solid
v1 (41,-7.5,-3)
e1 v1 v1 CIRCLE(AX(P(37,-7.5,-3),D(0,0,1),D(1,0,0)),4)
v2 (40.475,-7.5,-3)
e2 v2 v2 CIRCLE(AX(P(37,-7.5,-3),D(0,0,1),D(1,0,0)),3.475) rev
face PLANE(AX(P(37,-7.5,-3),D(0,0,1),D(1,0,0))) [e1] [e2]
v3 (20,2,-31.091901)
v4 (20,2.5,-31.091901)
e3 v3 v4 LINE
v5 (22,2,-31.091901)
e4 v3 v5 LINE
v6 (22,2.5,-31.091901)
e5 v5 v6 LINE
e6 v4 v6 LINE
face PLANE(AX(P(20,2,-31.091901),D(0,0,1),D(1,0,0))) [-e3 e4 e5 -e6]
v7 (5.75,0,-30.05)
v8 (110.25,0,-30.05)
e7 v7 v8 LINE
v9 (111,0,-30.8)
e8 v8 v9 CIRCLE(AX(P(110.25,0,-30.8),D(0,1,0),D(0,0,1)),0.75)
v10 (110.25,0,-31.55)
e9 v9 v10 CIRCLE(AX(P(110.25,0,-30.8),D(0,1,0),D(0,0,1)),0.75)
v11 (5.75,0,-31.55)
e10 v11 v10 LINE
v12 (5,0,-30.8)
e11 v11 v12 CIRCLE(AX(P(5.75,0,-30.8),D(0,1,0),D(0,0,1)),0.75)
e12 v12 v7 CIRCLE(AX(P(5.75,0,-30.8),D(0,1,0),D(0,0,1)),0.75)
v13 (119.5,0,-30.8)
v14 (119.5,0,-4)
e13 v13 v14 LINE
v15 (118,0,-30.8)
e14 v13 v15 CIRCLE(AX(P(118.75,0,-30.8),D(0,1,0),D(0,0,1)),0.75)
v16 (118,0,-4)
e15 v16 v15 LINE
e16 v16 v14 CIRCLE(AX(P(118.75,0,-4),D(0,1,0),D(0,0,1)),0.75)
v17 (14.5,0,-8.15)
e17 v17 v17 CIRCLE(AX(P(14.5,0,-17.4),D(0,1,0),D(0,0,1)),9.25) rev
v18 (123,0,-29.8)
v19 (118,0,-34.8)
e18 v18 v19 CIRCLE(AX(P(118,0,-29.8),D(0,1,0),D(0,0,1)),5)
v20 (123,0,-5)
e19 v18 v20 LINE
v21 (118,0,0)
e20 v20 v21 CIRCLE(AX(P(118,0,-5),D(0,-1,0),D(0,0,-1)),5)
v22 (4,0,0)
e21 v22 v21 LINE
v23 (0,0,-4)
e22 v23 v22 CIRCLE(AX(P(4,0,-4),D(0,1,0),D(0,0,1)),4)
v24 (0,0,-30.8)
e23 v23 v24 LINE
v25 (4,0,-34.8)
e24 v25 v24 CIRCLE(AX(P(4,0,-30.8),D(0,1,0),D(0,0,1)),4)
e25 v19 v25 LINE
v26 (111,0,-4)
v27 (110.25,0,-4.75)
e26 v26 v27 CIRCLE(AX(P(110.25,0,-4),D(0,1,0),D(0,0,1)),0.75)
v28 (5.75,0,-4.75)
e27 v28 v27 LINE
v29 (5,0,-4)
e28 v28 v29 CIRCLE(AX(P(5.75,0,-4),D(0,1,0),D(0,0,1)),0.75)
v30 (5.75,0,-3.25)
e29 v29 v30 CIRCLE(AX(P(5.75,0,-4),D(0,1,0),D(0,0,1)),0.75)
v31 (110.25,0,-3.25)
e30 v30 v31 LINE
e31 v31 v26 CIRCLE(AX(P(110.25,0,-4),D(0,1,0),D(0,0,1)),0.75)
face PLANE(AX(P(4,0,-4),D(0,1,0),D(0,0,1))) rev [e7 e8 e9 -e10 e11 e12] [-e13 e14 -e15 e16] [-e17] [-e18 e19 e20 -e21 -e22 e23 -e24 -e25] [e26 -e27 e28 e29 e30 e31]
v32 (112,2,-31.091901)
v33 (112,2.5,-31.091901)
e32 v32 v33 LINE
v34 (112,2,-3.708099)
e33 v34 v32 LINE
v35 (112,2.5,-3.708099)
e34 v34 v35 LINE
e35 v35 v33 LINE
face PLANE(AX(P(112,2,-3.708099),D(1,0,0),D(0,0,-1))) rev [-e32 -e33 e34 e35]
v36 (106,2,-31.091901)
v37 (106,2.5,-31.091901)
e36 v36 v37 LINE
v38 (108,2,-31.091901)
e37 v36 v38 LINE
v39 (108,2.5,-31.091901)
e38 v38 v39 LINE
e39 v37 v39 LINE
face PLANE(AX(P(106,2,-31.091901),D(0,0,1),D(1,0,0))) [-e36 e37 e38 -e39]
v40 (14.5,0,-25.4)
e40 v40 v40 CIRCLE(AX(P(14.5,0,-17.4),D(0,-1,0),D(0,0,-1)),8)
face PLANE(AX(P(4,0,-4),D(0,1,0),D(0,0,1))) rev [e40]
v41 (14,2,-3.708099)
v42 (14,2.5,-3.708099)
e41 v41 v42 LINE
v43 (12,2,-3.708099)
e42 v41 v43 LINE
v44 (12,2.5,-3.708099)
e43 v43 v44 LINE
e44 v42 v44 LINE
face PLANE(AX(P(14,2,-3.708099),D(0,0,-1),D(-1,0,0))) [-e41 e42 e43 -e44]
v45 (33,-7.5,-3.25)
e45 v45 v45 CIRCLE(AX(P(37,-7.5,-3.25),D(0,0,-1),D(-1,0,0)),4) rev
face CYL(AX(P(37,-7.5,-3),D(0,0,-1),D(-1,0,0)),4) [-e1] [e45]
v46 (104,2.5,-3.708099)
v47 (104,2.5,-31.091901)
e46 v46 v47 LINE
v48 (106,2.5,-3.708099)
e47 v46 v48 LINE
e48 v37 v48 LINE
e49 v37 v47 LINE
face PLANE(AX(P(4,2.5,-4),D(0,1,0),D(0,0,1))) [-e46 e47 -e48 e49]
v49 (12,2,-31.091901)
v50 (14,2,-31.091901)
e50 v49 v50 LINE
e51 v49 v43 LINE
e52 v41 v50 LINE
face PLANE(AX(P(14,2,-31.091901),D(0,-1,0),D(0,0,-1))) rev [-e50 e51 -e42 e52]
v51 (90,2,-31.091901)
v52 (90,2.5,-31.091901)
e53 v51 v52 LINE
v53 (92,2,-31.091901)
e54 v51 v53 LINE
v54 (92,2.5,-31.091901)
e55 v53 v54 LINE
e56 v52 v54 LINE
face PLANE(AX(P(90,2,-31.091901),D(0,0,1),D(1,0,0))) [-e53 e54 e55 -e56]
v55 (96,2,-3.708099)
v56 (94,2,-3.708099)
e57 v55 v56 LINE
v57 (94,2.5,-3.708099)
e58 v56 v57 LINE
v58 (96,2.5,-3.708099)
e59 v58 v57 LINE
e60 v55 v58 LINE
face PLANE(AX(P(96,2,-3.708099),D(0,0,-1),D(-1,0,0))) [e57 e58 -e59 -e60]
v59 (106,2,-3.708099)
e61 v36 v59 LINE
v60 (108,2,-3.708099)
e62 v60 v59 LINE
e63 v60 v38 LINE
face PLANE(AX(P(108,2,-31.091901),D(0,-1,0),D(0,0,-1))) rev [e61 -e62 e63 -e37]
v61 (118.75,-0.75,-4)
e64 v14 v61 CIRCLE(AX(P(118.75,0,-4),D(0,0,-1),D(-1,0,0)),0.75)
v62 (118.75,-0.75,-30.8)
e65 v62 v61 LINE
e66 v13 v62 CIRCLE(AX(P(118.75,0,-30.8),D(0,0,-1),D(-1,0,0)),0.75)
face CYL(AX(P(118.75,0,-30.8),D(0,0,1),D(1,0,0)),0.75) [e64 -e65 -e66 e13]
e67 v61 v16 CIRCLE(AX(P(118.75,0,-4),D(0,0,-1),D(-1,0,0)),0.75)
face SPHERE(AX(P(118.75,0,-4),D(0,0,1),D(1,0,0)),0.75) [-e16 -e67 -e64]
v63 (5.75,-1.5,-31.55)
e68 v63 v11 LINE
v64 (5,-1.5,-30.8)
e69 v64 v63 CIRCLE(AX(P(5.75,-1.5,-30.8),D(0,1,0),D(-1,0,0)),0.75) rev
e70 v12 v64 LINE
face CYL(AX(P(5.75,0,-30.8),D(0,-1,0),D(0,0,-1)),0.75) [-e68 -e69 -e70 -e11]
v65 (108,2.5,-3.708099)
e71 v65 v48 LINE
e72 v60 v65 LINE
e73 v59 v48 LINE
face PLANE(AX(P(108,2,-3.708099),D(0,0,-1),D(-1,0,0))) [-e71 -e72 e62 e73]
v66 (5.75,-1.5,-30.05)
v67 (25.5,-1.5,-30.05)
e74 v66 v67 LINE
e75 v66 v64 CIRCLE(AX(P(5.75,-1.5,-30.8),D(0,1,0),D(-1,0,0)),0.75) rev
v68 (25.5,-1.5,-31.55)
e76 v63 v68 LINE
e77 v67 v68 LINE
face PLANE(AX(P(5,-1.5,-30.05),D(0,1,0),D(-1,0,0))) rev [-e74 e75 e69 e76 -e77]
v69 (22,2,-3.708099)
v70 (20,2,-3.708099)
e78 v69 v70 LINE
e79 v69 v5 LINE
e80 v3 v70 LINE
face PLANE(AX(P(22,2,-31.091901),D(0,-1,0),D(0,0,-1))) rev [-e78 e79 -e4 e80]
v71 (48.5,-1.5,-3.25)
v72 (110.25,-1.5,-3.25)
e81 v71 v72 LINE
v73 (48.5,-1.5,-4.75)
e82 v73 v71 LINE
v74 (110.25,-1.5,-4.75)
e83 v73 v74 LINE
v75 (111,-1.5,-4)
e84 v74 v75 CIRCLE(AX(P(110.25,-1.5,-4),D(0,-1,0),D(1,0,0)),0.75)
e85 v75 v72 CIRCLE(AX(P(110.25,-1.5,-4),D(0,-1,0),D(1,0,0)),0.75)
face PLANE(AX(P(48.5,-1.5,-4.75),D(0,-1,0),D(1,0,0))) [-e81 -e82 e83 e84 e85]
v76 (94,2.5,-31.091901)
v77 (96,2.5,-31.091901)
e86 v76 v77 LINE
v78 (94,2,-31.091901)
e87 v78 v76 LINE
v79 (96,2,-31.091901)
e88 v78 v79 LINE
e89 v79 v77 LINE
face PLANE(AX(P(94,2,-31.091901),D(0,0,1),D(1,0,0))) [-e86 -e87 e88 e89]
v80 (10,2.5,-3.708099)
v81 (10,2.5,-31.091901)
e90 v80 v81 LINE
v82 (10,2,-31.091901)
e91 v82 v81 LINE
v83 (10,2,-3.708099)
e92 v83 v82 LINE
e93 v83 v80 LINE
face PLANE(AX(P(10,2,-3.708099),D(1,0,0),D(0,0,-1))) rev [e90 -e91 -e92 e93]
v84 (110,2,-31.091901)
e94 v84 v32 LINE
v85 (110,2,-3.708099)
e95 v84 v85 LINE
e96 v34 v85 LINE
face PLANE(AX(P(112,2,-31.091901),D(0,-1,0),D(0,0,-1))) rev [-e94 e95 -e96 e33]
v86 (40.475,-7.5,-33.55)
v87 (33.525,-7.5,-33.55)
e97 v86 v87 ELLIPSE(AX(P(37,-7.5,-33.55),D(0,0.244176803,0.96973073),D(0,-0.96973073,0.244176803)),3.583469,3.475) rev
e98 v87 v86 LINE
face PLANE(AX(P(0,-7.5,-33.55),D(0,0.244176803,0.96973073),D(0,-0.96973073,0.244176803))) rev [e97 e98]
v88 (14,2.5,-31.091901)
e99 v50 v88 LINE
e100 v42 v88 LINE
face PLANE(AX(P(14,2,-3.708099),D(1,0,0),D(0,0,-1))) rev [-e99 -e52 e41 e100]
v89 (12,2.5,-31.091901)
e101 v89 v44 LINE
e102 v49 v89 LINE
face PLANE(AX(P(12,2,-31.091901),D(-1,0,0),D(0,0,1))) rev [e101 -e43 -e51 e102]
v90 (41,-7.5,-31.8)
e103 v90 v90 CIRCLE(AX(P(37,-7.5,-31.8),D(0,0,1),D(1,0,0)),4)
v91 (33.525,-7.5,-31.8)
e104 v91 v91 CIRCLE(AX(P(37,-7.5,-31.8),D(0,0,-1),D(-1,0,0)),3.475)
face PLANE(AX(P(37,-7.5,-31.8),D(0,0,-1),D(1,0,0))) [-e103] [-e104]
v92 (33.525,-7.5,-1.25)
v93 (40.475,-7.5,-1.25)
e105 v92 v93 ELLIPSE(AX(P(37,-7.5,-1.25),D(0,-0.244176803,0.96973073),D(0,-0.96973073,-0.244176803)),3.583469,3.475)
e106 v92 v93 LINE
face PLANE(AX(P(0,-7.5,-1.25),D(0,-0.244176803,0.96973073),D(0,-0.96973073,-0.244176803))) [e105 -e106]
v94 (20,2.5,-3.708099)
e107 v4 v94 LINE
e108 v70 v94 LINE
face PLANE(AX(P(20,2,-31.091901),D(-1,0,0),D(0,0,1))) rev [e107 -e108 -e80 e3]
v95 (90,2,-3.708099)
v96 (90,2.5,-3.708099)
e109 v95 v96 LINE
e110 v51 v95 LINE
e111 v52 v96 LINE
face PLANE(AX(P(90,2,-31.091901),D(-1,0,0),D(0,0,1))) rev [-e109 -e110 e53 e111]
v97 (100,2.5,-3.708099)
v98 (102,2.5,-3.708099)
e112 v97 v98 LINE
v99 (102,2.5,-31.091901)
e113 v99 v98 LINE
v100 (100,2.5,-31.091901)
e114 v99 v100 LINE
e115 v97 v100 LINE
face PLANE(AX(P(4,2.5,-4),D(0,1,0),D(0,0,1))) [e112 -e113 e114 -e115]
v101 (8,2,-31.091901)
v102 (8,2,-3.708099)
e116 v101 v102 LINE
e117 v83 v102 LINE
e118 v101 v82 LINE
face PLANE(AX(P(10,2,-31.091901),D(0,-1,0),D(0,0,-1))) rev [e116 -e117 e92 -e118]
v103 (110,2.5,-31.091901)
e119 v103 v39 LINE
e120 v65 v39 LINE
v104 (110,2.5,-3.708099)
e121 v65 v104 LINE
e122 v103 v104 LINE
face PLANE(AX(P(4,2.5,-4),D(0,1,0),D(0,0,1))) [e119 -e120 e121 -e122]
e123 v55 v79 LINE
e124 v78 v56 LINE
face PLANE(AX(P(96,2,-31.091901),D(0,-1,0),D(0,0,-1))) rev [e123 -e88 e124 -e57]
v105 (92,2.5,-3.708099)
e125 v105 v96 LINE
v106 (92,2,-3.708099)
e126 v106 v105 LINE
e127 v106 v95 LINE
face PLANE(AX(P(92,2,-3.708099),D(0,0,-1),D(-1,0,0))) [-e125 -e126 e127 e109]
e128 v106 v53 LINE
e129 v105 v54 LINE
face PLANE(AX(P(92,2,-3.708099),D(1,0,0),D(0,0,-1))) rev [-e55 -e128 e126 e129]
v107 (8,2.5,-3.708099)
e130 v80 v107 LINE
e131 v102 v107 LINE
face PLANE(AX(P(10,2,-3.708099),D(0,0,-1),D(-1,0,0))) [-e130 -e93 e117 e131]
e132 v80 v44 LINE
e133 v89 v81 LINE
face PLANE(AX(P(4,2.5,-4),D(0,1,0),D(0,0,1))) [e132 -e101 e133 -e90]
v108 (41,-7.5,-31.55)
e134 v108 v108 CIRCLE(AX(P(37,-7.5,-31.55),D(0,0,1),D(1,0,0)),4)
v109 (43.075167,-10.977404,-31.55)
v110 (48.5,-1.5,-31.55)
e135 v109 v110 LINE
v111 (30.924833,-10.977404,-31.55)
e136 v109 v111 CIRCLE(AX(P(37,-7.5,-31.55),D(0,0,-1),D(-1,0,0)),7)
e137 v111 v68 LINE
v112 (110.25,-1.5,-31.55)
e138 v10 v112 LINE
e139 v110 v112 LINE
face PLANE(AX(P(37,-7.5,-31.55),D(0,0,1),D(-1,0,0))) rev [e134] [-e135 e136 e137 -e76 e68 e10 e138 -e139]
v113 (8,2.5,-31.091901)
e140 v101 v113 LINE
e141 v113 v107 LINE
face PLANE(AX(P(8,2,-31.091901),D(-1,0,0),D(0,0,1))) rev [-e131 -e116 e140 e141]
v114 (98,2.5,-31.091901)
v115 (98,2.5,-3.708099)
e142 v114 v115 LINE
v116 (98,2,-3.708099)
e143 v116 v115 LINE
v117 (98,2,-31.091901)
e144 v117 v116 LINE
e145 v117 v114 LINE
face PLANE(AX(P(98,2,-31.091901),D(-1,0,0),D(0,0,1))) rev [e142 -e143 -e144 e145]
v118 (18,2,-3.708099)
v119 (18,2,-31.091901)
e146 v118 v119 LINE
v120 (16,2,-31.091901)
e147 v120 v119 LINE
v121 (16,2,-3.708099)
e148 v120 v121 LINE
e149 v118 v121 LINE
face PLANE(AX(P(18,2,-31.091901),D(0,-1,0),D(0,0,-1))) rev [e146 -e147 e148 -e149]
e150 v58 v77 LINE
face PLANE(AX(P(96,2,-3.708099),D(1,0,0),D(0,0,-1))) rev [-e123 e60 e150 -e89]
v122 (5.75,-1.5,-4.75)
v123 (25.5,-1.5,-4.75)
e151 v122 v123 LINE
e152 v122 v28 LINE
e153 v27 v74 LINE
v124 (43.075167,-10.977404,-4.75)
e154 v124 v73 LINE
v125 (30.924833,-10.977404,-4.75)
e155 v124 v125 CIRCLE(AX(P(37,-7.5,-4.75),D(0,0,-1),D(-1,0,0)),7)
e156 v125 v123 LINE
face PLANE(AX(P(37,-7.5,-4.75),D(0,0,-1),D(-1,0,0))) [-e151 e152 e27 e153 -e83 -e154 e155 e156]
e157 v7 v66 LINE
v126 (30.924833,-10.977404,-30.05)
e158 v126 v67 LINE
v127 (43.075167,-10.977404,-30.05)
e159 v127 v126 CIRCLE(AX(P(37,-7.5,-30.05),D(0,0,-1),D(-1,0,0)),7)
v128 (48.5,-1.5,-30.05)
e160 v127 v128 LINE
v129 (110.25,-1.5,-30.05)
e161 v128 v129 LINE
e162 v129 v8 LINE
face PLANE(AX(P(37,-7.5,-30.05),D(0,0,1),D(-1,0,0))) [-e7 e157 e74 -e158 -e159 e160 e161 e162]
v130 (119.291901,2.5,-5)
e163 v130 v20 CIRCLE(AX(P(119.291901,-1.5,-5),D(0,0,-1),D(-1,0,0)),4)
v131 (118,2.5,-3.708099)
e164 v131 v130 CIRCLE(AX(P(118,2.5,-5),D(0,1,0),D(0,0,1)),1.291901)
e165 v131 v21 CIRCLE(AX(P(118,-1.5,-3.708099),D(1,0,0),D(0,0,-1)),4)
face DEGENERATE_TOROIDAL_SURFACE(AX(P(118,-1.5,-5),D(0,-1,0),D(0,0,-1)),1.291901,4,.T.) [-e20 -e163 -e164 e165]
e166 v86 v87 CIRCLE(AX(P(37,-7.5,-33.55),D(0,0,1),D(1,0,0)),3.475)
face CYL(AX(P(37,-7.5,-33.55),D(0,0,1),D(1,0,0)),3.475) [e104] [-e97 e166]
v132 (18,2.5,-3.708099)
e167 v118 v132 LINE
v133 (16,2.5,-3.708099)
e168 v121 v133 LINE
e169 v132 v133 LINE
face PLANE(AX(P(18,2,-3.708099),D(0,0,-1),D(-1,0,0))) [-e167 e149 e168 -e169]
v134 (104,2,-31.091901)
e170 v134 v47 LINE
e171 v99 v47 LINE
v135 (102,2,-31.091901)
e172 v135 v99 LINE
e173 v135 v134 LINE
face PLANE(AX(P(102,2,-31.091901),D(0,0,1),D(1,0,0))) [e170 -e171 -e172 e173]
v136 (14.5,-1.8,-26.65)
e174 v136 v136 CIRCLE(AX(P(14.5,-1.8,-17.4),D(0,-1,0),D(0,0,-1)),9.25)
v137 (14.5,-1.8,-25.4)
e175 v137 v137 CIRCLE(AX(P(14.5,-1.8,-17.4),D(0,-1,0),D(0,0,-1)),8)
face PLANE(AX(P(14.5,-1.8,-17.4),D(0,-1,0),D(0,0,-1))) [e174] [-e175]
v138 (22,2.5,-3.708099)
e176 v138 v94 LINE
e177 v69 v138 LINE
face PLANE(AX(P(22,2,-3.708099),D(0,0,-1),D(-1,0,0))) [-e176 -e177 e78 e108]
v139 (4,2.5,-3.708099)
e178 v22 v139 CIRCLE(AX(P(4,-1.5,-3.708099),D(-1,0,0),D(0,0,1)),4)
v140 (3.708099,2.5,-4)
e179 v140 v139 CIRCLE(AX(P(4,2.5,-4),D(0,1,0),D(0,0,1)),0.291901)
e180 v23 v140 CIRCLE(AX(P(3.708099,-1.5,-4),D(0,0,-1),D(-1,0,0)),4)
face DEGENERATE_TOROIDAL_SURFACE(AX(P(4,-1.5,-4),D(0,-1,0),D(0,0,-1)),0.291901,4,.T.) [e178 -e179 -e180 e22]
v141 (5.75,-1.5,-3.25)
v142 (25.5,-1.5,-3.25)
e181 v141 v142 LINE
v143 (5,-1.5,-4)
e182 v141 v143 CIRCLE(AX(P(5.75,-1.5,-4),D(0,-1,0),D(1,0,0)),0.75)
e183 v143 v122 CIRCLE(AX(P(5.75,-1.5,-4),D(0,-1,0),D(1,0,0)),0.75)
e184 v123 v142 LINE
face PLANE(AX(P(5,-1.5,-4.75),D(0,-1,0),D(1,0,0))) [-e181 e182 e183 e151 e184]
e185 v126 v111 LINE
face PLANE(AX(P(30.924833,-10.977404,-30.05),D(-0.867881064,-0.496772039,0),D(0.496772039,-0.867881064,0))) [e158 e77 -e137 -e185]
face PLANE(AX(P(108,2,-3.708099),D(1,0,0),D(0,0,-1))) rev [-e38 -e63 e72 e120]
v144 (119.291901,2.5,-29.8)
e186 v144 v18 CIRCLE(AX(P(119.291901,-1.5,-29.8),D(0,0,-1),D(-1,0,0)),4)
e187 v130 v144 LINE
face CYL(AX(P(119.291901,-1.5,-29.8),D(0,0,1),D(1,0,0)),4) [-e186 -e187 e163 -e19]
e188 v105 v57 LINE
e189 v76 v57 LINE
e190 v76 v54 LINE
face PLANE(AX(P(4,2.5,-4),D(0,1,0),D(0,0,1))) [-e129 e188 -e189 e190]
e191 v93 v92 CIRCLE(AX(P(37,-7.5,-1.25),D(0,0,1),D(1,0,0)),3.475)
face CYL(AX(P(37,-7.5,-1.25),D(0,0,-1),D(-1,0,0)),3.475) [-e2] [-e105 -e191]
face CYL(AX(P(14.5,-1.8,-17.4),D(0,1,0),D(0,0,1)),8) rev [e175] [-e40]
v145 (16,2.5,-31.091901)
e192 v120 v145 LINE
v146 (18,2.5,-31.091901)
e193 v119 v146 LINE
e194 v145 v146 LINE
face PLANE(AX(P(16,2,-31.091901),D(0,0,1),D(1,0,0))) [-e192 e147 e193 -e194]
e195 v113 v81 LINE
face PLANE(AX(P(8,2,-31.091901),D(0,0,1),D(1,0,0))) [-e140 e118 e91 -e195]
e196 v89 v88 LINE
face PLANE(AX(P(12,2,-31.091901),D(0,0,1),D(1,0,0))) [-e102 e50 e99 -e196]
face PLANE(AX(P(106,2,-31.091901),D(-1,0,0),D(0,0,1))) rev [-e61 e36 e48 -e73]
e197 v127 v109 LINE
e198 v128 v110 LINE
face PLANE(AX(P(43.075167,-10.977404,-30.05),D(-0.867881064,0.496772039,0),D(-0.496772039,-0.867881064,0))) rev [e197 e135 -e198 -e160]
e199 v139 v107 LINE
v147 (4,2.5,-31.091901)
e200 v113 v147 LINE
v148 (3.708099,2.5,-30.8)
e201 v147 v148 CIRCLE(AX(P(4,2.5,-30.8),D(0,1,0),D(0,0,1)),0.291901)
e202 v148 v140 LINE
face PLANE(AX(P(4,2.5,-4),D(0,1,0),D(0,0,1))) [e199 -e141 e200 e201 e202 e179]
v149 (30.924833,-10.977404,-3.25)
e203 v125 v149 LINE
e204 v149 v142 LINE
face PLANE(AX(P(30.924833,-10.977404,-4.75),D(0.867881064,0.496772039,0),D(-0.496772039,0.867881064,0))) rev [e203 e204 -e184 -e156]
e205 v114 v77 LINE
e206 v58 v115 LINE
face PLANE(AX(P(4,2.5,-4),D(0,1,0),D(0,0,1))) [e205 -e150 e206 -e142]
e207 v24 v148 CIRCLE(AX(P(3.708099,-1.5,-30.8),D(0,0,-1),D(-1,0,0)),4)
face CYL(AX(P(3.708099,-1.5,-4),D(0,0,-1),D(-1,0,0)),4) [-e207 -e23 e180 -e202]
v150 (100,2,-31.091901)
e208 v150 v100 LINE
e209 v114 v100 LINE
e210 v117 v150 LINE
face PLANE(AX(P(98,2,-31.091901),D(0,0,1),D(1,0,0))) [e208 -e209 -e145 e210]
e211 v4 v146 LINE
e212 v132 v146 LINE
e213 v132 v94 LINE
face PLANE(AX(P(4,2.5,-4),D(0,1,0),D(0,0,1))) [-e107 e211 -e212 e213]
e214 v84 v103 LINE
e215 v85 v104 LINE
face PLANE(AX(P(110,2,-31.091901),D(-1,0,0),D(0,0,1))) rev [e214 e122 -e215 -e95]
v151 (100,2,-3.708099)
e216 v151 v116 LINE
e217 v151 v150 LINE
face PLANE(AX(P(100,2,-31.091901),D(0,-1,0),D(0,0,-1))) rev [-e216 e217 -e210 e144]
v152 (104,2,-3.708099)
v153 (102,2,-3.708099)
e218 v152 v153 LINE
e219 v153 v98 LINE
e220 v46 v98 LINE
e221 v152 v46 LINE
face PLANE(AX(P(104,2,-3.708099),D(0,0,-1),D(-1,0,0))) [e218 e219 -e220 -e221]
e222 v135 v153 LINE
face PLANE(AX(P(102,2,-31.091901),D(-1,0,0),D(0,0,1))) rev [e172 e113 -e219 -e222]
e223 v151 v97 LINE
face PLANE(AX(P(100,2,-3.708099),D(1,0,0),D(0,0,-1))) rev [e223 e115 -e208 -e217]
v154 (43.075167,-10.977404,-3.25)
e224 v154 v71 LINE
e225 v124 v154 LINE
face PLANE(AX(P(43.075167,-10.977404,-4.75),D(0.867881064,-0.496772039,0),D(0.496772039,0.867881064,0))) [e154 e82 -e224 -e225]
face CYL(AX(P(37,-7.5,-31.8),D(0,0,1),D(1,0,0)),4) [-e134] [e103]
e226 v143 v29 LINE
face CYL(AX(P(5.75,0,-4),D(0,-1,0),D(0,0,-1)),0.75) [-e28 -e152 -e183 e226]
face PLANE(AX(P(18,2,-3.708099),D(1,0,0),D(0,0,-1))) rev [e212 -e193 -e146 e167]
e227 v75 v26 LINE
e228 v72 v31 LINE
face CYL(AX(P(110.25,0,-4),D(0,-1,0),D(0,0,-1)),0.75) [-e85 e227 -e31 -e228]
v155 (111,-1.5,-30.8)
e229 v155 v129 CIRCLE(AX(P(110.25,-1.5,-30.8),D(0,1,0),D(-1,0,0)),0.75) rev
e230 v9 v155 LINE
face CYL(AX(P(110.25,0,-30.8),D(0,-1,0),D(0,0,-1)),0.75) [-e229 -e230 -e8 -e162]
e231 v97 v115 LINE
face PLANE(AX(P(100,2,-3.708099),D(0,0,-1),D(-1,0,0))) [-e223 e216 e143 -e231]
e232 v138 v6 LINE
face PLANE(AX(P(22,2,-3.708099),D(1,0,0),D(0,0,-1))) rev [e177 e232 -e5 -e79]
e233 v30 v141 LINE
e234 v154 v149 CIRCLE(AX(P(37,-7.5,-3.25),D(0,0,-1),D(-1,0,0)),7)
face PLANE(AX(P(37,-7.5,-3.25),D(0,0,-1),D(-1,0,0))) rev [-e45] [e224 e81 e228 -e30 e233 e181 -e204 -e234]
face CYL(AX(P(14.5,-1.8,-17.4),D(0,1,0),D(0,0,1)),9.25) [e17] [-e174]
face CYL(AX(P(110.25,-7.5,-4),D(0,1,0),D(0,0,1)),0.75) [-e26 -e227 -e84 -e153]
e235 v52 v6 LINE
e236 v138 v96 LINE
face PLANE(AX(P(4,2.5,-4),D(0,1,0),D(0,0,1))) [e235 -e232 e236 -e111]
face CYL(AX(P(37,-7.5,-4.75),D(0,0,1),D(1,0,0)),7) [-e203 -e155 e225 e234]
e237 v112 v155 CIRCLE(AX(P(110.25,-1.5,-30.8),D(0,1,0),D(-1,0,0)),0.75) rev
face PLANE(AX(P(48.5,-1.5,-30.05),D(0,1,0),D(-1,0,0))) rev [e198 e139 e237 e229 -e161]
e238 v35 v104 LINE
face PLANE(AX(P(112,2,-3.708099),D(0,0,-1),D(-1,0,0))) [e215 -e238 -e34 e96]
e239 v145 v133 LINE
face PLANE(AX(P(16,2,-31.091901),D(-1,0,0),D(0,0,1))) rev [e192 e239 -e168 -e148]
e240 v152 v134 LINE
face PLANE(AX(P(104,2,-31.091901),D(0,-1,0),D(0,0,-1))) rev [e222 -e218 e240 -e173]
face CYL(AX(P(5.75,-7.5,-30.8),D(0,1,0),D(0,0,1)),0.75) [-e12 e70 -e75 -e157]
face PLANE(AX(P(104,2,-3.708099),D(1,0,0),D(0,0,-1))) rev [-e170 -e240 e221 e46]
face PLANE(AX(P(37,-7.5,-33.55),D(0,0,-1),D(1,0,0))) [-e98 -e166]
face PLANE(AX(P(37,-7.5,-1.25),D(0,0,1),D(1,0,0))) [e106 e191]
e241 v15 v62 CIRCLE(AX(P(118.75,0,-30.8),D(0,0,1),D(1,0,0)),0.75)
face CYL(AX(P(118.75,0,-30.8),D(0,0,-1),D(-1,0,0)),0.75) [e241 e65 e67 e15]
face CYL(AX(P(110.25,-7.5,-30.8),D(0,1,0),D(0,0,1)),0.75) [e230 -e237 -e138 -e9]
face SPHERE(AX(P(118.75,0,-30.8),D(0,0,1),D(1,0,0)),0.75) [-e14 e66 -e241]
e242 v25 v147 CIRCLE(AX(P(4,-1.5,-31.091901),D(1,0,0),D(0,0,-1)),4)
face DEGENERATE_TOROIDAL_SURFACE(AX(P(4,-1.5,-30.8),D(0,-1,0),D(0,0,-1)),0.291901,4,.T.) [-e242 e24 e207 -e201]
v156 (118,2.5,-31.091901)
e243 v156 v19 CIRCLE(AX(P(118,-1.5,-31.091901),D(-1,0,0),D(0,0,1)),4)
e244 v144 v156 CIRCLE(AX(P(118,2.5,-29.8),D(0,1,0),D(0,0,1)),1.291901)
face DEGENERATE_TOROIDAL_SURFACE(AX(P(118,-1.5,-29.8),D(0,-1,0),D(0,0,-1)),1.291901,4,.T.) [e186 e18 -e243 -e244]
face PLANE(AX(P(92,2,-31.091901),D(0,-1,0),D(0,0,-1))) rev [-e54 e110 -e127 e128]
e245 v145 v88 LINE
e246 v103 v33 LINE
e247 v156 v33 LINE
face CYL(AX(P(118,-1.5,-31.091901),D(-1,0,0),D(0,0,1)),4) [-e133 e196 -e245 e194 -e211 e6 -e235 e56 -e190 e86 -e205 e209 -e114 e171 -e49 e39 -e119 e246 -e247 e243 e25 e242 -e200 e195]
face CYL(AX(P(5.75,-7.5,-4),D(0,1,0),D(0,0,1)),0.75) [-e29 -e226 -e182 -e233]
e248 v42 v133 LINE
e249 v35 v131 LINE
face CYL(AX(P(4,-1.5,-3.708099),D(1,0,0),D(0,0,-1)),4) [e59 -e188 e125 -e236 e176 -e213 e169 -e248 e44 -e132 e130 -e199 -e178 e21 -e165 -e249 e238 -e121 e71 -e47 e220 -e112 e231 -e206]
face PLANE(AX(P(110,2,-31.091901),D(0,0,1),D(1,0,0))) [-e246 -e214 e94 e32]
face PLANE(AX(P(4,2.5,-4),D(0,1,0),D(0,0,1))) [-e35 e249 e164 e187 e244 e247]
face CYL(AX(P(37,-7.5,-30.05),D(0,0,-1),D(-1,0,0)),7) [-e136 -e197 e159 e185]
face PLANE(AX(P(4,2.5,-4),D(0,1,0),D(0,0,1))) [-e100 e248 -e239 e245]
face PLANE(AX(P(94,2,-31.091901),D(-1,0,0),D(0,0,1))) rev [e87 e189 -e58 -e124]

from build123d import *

# Parameters (mm, degrees)
BASE_EXTRUDE_DEPTH   = 2.5
FILLET1_R            = 4
BOSS_EXTRUDE1_DEPTH  = 1.5
FILLET2_R            = 0.75
SKETCH4_R            = 4
BOSS_EXTRUDE2_DEPTH  = 0.25
SKETCH5_R            = 3.475
BOSS_EXTRUDE7_DEPTH  = 2
CUT_EXTRUDE2_DEPTH   = 129.647930415
FILLET2_OF_MIRROR1_R = 0.75
BOSS_EXTRUDE8_DEPTH  = 0.75
FILLET3_R            = 0.75
SKETCH8_R            = 9.25
SKETCH8_R_2          = 8
BOSS_EXTRUDE9_DEPTH  = 1.8
SKETCH9_W            = 2
SKETCH9_H            = 27.383801512
CUT_EXTRUDE3_DEPTH   = 0.5
LPATTERN1_COUNT      = 6
LPATTERN1_PITCH      = 4
SKETCH10_W           = 2
SKETCH10_H           = 27.383801512
CUT_EXTRUDE4_DEPTH   = 0.5
LPATTERN2_COUNT      = 4
LPATTERN2_PITCH      = 4


# Some blends are built 0.0001 mm under size
with BuildPart() as part:
    # Sketch1 → Base-Extrude (new body)
    with BuildSketch(Plane(origin=(0, 0, 0), x_dir=(1, 0, 0), z_dir=(0, 1, 0))):
        with BuildLine():
            Line((4, 0), (118, 0))
            ThreePointArc((118, 0), (121.535533906, 1.464466094), (123, 5))
            Line((123, 5), (123, 29.8))
            ThreePointArc((123, 29.8), (121.535533906, 33.335533906), (118, 34.8))
            Line((118, 34.8), (4, 34.8))
            ThreePointArc((4, 34.8), (1.171572875, 33.628427125), (0, 30.8))
            Line((0, 30.8), (0, 4))
            ThreePointArc((0, 4), (1.171572875, 1.171572875), (4, 0))
        make_face()
    extrude(amount=BASE_EXTRUDE_DEPTH)

    # Fillet1
    # the kernel refuses this fillet: 4 mm, written as the material it takes off along each edge
    with BuildSketch(Plane(origin=(118, 2.5, -5), x_dir=(0, 0, 1), z_dir=(-1, 0, 0))) as fillet1_piece_1:
        with BuildLine():
            CenterArc((1.291900756, -4), FILLET1_R, 22.024312837, 67.975687163)
            Line((1.291900756, 0), (1.291900756, 0.08))
            Line((1.291900756, 0.08), (5, 0.08))
            Line((5, 0.08), (5.08, 0))
            ThreePointArc((5.08, 0), (5.08, -1.25), (5.074161985, -2.47))
            Line((5.074161985, -2.47), (5, -2.5))
        make_face()
    revolve(axis=Axis((118, 2.5, -5), (0, 1, 0)), revolution_arc=90, mode=Mode.SUBTRACT)
    with BuildSketch(Plane(origin=(123, 2.5, -5), x_dir=(0, -1, 0), z_dir=(0, 0, -1))) as fillet1_piece_2:
        with BuildLine():
            CenterArc((4, 3.708099244), FILLET1_R, 180, 67.975687163)
            Line((0, 3.708099244), (-0.08, 3.708099244))
            Line((-0.08, 3.708099244), (-0.08, 0))
            Line((-0.08, 0), (0, -0.08))
            ThreePointArc((0, -0.08), (1.25, -0.08), (2.47, -0.074161985))
            Line((2.47, -0.074161985), (2.5, 0))
        make_face()
    extrude(amount=24.8, mode=Mode.SUBTRACT)
    with BuildSketch(Plane(origin=(118, 2.5, -29.8), x_dir=(1, 0, 0), z_dir=(0, 0, 1))) as fillet1_piece_3:
        with BuildLine():
            CenterArc((1.291900756, -4), FILLET1_R, 22.024312837, 67.975687163)
            Line((1.291900756, 0), (1.291900756, 0.08))
            Line((1.291900756, 0.08), (5, 0.08))
            Line((5, 0.08), (5.08, 0))
            ThreePointArc((5.08, 0), (5.08, -1.25), (5.074161985, -2.47))
            Line((5.074161985, -2.47), (5, -2.5))
        make_face()
    revolve(axis=Axis((118, 2.5, -29.8), (0, 1, 0)), revolution_arc=90, mode=Mode.SUBTRACT)
    with BuildSketch(Plane(origin=(118, 2.5, -34.8), x_dir=(0, -1, 0), z_dir=(-1, 0, 0)), Plane(origin=(4, 2.5, 0), x_dir=(0, -1, 0), z_dir=(1, 0, 0))) as fillet1_piece_4:
        with BuildLine():
            CenterArc((4, 3.708099244), FILLET1_R, 180, 67.975687163)
            Line((0, 3.708099244), (-0.08, 3.708099244))
            Line((-0.08, 3.708099244), (-0.08, 0))
            Line((-0.08, 0), (0, -0.08))
            ThreePointArc((0, -0.08), (1.25, -0.08), (2.47, -0.074161985))
            Line((2.47, -0.074161985), (2.5, 0))
        make_face()
    extrude(amount=114, mode=Mode.SUBTRACT)
    with BuildSketch(Plane(origin=(4, 2.5, -30.8), x_dir=(0, 0, -1), z_dir=(1, 0, 0))) as fillet1_piece_5:
        with BuildLine():
            CenterArc((0.291900756, -4), FILLET1_R, 22.024312837, 67.975687163)
            Line((0.291900756, 0), (0.291900756, 0.08))
            Line((0.291900756, 0.08), (4, 0.08))
            Line((4, 0.08), (4.08, 0))
            ThreePointArc((4.08, 0), (4.08, -1.25), (4.074161985, -2.47))
            Line((4.074161985, -2.47), (4, -2.5))
        make_face()
    revolve(axis=Axis((4, 2.5, -30.8), (0, 1, 0)), revolution_arc=90, mode=Mode.SUBTRACT)
    with BuildSketch(Plane(origin=(0, 2.5, -30.8), x_dir=(0, -1, 0), z_dir=(0, 0, 1))) as fillet1_piece_6:
        with BuildLine():
            CenterArc((4, 3.708099244), FILLET1_R, 180, 67.975687163)
            Line((0, 3.708099244), (-0.08, 3.708099244))
            Line((-0.08, 3.708099244), (-0.08, 0))
            Line((-0.08, 0), (0, -0.08))
            ThreePointArc((0, -0.08), (1.25, -0.08), (2.47, -0.074161985))
            Line((2.47, -0.074161985), (2.5, 0))
        make_face()
    extrude(amount=26.8, mode=Mode.SUBTRACT)
    with BuildSketch(Plane(origin=(4, 2.5, -4), x_dir=(-1, 0, 0), z_dir=(0, 0, -1))) as fillet1_piece_7:
        with BuildLine():
            CenterArc((0.291900756, -4), FILLET1_R, 22.024312837, 67.975687163)
            Line((0.291900756, 0), (0.291900756, 0.08))
            Line((0.291900756, 0.08), (4, 0.08))
            Line((4, 0.08), (4.08, 0))
            ThreePointArc((4.08, 0), (4.08, -1.25), (4.074161985, -2.47))
            Line((4.074161985, -2.47), (4, -2.5))
        make_face()
    revolve(axis=Axis((4, 2.5, -4), (0, 1, 0)), revolution_arc=90, mode=Mode.SUBTRACT)

    # Sketch3 → Boss-Extrude1 (add)
    with BuildSketch(Plane.XY.offset(-3.25)):
        with BuildLine():
            Line((5, 0), (111, 0))
            Line((111, 0), (111, -1.5))
            Line((111, -1.5), (48.5, -1.5))
            Line((48.5, -1.5), (43.075167447, -10.977404274))
            ThreePointArc((43.075167447, -10.977404274), (37, -14.5), (30.924832553, -10.977404274))
            Line((30.924832553, -10.977404274), (25.5, -1.5))
            Line((25.5, -1.5), (5, -1.5))
            Line((5, -1.5), (5, 0))
        make_face()
    boss_extrude1 = extrude(amount=-BOSS_EXTRUDE1_DEPTH)

    # Fillet2
    fillet2_edges = [part.edges().sort_by_distance(p)[0] for p in [
        (5, -0.75, -4.75),
        (111, -0.75, -3.25),
        (111, -0.75, -4.75),
        (5, -0.75, -3.25),
    ]]
    fillet(fillet2_edges, radius=FILLET2_R - 0.0001)  # a hair under: the kernel refuses the full size

    # Sketch4 → Boss-Extrude2 (add)
    with BuildSketch(Plane.XY.offset(-3.25)):
        with Locations(Location((37, -7.5, 0), (0, 0, 180))):
            Circle(SKETCH4_R)
    boss_extrude2 = extrude(amount=BOSS_EXTRUDE2_DEPTH)

    # Sketch5 → Boss-Extrude7 (add)
    with BuildSketch(Plane.XY.offset(-3.25)):
        with Locations((37, -7.5)):
            Circle(SKETCH5_R)
    boss_extrude7 = extrude(amount=BOSS_EXTRUDE7_DEPTH)

    # Sketch6 → Cut-Extrude2 (cut, through all)
    with BuildSketch(Plane(origin=(0, 0, 0), x_dir=(0, 0, -1), z_dir=(1, 0, 0))):
        Polygon((-18.452365233, 70.746536211), (1.25, -7.5), (2.125, -10.975), (21.827365233, -89.221536211), (-134.665707189, -128.626266677), (-174.945437655, 31.341805745), align=None)
    cut_extrude2 = extrude(amount=CUT_EXTRUDE2_DEPTH, mode=Mode.SUBTRACT)

    # Mirror1: Boss-Extrude1, Boss-Extrude2, Boss-Extrude7, Cut-Extrude2 across plane
    add(boss_extrude1.mirror(Plane.XY.offset(-17.4)))
    add(boss_extrude2.mirror(Plane.XY.offset(-17.4)))
    add(boss_extrude7.mirror(Plane.XY.offset(-17.4)))
    add(cut_extrude2.mirror(Plane.XY.offset(-17.4)), mode=Mode.SUBTRACT)

    # Fillet2 of Mirror1
    fillet2_of_mirror1_edges = [part.edges().sort_by_distance(p)[0] for p in [
        (5, -0.75, -30.05),
        (111, -0.75, -31.55),
        (111, -0.75, -30.05),
        (5, -0.75, -31.55),
    ]]
    fillet(fillet2_of_mirror1_edges, radius=FILLET2_OF_MIRROR1_R - 0.0001)  # a hair under: the kernel refuses the full size

    # Sketch7 → Boss-Extrude8 (add)
    with BuildSketch(Plane.XZ):
        with BuildLine():
            Line((119.5, -30.8), (119.5, -4))
            ThreePointArc((119.5, -4), (118.75, -3.25), (118, -4))
            Line((118, -4), (118, -30.8))
            ThreePointArc((118, -30.8), (118.75, -31.55), (119.5, -30.8))
        make_face()
    extrude(amount=BOSS_EXTRUDE8_DEPTH)

    # Fillet3
    fillet3_edges = [part.edges().sort_by_distance(p)[0] for p in [
        (118.75, -0.75, -31.55),
        (118.75, -0.75, -3.25),
        (119.5, -0.75, -17.4),
        (118, -0.75, -17.4),
    ]]
    fillet(fillet3_edges, radius=FILLET3_R - 0.0001)  # a hair under: the kernel refuses the full size

    # Sketch8 → Boss-Extrude9 (add)
    with BuildSketch(Plane.XZ):
        with Locations(Location((14.5, -17.4, 0), (0, 0, 90))):
            Circle(SKETCH8_R)
        with Locations(Location((14.5, -17.4, 0), (0, 0, 270))):
            Circle(SKETCH8_R_2, mode=Mode.SUBTRACT)
    extrude(amount=BOSS_EXTRUDE9_DEPTH)

    # Sketch9 → Cut-Extrude3 (cut)
    with BuildSketch(Plane(origin=(0, 2.5, 0), x_dir=(-1, 0, 0), z_dir=(0, 1, 0))):
        with Locations((-111, -17.4)):
            Rectangle(SKETCH9_W, SKETCH9_H)
    cut_extrude3 = extrude(amount=-CUT_EXTRUDE3_DEPTH, mode=Mode.SUBTRACT)

    # LPattern1: Cut-Extrude3 ×6
    with Locations(*[(-i * LPATTERN1_PITCH, 0, 0) for i in range(1, LPATTERN1_COUNT)]):
        add(cut_extrude3, mode=Mode.SUBTRACT)

    # Sketch10 → Cut-Extrude4 (cut)
    with BuildSketch(Plane(origin=(-102, 2.5, 0), x_dir=(-1, 0, 0), z_dir=(0, 1, 0))):
        with Locations((-111, -17.4)):
            Rectangle(SKETCH10_W, SKETCH10_H)
    cut_extrude4 = extrude(amount=-CUT_EXTRUDE4_DEPTH, mode=Mode.SUBTRACT)

    # LPattern2: Cut-Extrude4 ×4
    with Locations(*[(i * LPATTERN2_PITCH, 0, 0) for i in range(1, LPATTERN2_COUNT)]):
        add(cut_extrude4, mode=Mode.SUBTRACT)


solid = part.part
